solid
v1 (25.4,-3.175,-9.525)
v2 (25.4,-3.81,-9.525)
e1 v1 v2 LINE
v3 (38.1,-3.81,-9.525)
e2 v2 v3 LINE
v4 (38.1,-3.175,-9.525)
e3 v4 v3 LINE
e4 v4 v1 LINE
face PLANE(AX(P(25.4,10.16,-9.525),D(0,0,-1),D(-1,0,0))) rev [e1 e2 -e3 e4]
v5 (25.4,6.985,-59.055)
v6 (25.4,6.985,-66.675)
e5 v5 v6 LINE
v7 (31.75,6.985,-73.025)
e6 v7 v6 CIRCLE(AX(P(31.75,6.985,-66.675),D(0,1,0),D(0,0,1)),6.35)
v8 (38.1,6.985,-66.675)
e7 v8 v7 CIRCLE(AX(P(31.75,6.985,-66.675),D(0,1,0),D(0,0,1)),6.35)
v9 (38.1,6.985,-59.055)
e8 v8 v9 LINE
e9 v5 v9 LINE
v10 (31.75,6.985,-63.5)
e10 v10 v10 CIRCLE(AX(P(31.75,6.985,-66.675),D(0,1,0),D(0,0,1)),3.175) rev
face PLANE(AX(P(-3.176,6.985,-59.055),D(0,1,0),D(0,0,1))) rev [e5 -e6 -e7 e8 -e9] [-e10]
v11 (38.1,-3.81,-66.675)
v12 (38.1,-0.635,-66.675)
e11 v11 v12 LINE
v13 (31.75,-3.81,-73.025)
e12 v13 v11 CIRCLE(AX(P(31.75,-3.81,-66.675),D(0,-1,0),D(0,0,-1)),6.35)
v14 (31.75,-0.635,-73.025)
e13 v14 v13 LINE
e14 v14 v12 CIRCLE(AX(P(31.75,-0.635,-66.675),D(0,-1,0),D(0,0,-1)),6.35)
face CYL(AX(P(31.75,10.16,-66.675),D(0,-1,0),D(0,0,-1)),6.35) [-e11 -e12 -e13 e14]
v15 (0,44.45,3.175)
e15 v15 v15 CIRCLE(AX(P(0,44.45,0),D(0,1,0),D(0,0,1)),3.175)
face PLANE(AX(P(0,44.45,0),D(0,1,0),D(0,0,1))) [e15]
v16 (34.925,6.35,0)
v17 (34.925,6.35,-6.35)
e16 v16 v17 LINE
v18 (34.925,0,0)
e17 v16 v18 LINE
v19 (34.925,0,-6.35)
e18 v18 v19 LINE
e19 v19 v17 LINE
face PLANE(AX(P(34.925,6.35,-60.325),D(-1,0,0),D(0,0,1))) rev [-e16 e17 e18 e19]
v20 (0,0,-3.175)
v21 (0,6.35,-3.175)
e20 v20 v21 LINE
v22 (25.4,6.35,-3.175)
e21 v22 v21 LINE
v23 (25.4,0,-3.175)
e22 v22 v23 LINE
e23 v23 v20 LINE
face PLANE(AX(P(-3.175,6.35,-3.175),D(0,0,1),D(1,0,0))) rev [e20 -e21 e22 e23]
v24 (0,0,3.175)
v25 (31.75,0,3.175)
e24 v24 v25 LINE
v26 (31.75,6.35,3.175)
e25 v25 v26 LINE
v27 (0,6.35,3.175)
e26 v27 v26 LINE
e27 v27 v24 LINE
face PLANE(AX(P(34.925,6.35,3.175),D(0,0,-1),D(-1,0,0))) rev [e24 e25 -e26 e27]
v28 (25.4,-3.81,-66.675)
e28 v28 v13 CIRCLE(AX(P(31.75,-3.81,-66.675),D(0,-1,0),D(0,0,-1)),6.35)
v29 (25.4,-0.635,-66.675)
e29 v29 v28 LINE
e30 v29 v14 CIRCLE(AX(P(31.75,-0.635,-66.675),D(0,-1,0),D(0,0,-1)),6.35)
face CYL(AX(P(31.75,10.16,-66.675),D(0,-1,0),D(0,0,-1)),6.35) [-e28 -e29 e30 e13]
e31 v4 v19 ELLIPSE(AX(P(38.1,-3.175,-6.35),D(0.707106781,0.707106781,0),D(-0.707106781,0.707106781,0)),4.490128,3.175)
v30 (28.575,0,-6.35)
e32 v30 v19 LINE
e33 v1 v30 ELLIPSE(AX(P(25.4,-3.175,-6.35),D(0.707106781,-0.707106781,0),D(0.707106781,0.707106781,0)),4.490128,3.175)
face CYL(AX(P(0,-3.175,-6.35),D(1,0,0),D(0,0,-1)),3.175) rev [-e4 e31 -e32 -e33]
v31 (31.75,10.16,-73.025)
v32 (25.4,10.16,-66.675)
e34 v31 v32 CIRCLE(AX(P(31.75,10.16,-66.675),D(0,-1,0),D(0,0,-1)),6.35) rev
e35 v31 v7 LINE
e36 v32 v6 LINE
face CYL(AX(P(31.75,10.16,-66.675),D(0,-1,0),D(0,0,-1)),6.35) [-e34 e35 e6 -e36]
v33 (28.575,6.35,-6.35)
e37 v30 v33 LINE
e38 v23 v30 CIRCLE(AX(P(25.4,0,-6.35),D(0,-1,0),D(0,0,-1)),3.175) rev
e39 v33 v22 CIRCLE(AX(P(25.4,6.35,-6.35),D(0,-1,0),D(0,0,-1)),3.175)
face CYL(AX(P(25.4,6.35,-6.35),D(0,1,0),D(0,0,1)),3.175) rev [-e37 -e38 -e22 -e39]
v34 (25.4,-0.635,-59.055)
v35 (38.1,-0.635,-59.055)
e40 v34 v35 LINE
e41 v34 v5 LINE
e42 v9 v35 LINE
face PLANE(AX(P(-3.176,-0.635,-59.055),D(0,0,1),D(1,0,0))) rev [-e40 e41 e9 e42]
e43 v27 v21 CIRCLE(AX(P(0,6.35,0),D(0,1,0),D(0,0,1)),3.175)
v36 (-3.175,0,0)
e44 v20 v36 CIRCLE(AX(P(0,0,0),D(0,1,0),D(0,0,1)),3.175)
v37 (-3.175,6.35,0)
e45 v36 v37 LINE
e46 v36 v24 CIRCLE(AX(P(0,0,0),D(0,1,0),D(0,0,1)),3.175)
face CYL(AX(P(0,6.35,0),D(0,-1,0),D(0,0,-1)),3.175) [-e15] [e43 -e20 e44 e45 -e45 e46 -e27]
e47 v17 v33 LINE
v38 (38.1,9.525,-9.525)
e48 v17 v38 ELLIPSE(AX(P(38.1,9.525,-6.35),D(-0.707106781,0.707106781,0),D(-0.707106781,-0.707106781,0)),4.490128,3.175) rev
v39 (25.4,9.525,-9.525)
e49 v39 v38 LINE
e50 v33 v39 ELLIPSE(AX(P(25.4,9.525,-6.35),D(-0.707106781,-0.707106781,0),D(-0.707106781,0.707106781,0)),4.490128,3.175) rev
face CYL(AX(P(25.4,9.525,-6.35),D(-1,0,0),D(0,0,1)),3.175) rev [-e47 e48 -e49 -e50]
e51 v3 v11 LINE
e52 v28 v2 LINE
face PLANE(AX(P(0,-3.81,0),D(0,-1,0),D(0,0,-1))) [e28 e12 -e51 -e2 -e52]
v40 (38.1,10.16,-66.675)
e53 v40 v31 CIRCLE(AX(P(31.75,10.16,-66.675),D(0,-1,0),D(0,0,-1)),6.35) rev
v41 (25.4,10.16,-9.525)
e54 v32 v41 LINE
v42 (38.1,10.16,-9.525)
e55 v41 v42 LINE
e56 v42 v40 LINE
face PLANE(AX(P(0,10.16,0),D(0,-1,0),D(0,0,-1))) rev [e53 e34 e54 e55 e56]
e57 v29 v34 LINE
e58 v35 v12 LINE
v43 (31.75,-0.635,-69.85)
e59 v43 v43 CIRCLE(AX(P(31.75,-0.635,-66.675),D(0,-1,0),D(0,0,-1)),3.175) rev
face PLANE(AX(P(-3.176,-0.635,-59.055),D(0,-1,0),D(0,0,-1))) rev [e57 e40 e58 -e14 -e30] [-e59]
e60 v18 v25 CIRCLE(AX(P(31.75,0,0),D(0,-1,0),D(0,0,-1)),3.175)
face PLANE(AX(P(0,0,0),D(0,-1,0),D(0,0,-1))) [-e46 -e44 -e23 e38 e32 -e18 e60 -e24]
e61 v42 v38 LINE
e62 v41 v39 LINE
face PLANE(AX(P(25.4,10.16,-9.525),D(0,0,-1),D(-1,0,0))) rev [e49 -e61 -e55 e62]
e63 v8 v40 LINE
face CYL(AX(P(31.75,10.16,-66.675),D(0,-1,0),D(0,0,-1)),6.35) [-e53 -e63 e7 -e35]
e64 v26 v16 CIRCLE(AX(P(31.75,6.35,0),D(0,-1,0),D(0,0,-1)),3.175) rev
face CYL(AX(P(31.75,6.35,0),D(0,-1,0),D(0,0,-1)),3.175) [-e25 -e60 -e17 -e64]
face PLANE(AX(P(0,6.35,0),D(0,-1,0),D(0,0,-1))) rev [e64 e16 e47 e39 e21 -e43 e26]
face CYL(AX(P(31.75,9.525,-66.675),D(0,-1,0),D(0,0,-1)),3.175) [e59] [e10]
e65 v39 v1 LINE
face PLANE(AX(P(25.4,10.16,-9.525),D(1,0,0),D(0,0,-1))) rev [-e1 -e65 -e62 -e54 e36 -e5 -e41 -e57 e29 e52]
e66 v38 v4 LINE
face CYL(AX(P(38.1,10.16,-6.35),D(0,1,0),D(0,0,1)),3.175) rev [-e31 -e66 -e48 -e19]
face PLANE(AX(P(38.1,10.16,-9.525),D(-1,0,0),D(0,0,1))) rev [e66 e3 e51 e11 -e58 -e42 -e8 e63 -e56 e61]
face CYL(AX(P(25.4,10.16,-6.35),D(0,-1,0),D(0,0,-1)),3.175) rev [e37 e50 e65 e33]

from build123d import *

# Parameters (mm, degrees)
SKETCH1_R                = 3.175
BOSS_EXTRUDE1_DEPTH      = 38.1
BOSS_EXTRUDE2_DEPTH      = 6.35
FILLET1_R                = 3.175
BOSS_EXTRUDE3_DEPTH      = 3.81
BOSS_EXTRUDE3_DEPTH_BACK = 10.16
SKETCH3_W                = 12.7
SKETCH3_H                = 63.5
FILLET2_R                = 3.175
FILLET3_R                = 6.35
CUT_EXTRUDE1_REACH       = 94.13
SKETCH4_W                = 15.24
SKETCH4_H                = 7.62
SKETCH5_R                = 3.175
BOSS_EXTRUDE4_DEPTH      = 10.16
BOSS_EXTRUDE5_START      = 38.1
SKETCH6_R                = 3.175
BOSS_EXTRUDE5_DEPTH      = 38.1
SKETCH7_R                = 3.175
CUT_EXTRUDE2_DEPTH       = 38.1


with BuildPart() as part:
    # Sketch1 → Boss-Extrude1 (new body)
    with BuildSketch(Plane(origin=(0, 0, 0), x_dir=(1, 0, 0), z_dir=(0, 1, 0))):
        with Locations(Location((0, 0, 0), (0, 0, 270))):
            Circle(SKETCH1_R)
    extrude(amount=-BOSS_EXTRUDE1_DEPTH)

    # Sketch2 → Boss-Extrude2 (add)
    with BuildSketch(Plane(origin=(0, 0, 0), x_dir=(1, 0, 0), z_dir=(0, 1, 0))):
        Polygon((34.925, -3.175), (-3.175, -3.175), (-3.175, 3.175), (28.575, 3.175), (28.575, 60.325), (34.925, 60.325), align=None)
    extrude(amount=BOSS_EXTRUDE2_DEPTH)

    # Fillet1
    fillet1_edges = [part.edges().sort_by_distance(p)[0] for p in [
        (28.575, 3.175, -3.175),
        (34.925, 3.175, 3.175),
        (-3.175, 3.175, -3.175),
        (-3.175, 3.175, 3.175),
    ]]
    fillet(fillet1_edges, radius=FILLET1_R - 0.0001)  # a hair under: the kernel refuses the full size

    # Sketch3 → Boss-Extrude3 (add, two sides: drawn at the far end of the back side and taken through both)
    with BuildSketch(Plane(origin=(0, 6.35, 0), x_dir=(1, 0, 0), z_dir=(0, 1, 0)).offset(-BOSS_EXTRUDE3_DEPTH_BACK)):
        with Locations((31.75, 41.275)):
            Rectangle(SKETCH3_W, SKETCH3_H)
    extrude(amount=BOSS_EXTRUDE3_DEPTH + BOSS_EXTRUDE3_DEPTH_BACK)

    # Fillet2
    fillet2_edges = [part.edges().sort_by_distance(p)[0] for p in [
        (28.575, 3.175, -9.525),
        (31.75, 0, -9.525),
        (34.925, 3.175, -9.525),
        (31.75, 6.35, -9.525),
    ]]
    fillet(fillet2_edges, radius=FILLET2_R - 0.0001)  # a hair under: the kernel refuses the full size

    # Fillet3
    fillet3_edges = [part.edges().sort_by_distance(p)[0] for p in [
        (25.4, 3.175, -73.025),
        (38.1, 3.175, -73.025),
    ]]
    fillet(fillet3_edges, radius=FILLET3_R - 0.0001)  # a hair under: the kernel refuses the full size

    # Sketch4 → Cut-Extrude1 (cut, up to next)
    with BuildSketch(Plane(origin=(38.1, 0, 0), x_dir=(0, 0, -1), z_dir=(1, 0, 0)), mode=Mode.PRIVATE) as cut_extrude1_sk1:
        with Locations((66.675, 3.175)):
            Rectangle(SKETCH4_W, SKETCH4_H)
    cut_extrude1_tool1 = extrude(cut_extrude1_sk1.sketch, amount=-CUT_EXTRUDE1_REACH, mode=Mode.PRIVATE) & part.part
    add(cut_extrude1_tool1.solids().sort_by_distance((38.1, 3.175, -66.675))[0], mode=Mode.SUBTRACT)

    # Sketch5 → Boss-Extrude4 (add)
    with BuildSketch(Plane(origin=(0, -0.635, 0), x_dir=(1, 0, 0), z_dir=(0, 1, 0))):
        with Locations(Location((31.75, 66.675, 0), (0, 0, 90))):
            Circle(SKETCH5_R)
    extrude(amount=BOSS_EXTRUDE4_DEPTH)

    # Sketch6 → Boss-Extrude5 (add)
    with BuildSketch(Plane(origin=(0, 6.35, 0), x_dir=(1, 0, 0), z_dir=(0, 1, 0)).offset(BOSS_EXTRUDE5_START)):
        with Locations(Location((0, 0, 0), (0, 0, 270))):
            Circle(SKETCH6_R)
    extrude(amount=-BOSS_EXTRUDE5_DEPTH)

    # Sketch7 → Cut-Extrude2 (cut)
    with BuildSketch(Plane.XZ):
        with Locations(Location((0, 0, 0), (0, 0, 90))):
            Circle(SKETCH7_R)
    extrude(amount=CUT_EXTRUDE2_DEPTH, mode=Mode.SUBTRACT)


with BuildPart() as cut_extrude2_kept_piece:
    # of the separate pieces the step leaves, the one the design keeps (cut_extrude2_pieces_kept)
    add(part.part.solids().sort_by_distance((25.4, 10.16, -66.6751))[0])


solid = cut_extrude2_kept_piece.part
